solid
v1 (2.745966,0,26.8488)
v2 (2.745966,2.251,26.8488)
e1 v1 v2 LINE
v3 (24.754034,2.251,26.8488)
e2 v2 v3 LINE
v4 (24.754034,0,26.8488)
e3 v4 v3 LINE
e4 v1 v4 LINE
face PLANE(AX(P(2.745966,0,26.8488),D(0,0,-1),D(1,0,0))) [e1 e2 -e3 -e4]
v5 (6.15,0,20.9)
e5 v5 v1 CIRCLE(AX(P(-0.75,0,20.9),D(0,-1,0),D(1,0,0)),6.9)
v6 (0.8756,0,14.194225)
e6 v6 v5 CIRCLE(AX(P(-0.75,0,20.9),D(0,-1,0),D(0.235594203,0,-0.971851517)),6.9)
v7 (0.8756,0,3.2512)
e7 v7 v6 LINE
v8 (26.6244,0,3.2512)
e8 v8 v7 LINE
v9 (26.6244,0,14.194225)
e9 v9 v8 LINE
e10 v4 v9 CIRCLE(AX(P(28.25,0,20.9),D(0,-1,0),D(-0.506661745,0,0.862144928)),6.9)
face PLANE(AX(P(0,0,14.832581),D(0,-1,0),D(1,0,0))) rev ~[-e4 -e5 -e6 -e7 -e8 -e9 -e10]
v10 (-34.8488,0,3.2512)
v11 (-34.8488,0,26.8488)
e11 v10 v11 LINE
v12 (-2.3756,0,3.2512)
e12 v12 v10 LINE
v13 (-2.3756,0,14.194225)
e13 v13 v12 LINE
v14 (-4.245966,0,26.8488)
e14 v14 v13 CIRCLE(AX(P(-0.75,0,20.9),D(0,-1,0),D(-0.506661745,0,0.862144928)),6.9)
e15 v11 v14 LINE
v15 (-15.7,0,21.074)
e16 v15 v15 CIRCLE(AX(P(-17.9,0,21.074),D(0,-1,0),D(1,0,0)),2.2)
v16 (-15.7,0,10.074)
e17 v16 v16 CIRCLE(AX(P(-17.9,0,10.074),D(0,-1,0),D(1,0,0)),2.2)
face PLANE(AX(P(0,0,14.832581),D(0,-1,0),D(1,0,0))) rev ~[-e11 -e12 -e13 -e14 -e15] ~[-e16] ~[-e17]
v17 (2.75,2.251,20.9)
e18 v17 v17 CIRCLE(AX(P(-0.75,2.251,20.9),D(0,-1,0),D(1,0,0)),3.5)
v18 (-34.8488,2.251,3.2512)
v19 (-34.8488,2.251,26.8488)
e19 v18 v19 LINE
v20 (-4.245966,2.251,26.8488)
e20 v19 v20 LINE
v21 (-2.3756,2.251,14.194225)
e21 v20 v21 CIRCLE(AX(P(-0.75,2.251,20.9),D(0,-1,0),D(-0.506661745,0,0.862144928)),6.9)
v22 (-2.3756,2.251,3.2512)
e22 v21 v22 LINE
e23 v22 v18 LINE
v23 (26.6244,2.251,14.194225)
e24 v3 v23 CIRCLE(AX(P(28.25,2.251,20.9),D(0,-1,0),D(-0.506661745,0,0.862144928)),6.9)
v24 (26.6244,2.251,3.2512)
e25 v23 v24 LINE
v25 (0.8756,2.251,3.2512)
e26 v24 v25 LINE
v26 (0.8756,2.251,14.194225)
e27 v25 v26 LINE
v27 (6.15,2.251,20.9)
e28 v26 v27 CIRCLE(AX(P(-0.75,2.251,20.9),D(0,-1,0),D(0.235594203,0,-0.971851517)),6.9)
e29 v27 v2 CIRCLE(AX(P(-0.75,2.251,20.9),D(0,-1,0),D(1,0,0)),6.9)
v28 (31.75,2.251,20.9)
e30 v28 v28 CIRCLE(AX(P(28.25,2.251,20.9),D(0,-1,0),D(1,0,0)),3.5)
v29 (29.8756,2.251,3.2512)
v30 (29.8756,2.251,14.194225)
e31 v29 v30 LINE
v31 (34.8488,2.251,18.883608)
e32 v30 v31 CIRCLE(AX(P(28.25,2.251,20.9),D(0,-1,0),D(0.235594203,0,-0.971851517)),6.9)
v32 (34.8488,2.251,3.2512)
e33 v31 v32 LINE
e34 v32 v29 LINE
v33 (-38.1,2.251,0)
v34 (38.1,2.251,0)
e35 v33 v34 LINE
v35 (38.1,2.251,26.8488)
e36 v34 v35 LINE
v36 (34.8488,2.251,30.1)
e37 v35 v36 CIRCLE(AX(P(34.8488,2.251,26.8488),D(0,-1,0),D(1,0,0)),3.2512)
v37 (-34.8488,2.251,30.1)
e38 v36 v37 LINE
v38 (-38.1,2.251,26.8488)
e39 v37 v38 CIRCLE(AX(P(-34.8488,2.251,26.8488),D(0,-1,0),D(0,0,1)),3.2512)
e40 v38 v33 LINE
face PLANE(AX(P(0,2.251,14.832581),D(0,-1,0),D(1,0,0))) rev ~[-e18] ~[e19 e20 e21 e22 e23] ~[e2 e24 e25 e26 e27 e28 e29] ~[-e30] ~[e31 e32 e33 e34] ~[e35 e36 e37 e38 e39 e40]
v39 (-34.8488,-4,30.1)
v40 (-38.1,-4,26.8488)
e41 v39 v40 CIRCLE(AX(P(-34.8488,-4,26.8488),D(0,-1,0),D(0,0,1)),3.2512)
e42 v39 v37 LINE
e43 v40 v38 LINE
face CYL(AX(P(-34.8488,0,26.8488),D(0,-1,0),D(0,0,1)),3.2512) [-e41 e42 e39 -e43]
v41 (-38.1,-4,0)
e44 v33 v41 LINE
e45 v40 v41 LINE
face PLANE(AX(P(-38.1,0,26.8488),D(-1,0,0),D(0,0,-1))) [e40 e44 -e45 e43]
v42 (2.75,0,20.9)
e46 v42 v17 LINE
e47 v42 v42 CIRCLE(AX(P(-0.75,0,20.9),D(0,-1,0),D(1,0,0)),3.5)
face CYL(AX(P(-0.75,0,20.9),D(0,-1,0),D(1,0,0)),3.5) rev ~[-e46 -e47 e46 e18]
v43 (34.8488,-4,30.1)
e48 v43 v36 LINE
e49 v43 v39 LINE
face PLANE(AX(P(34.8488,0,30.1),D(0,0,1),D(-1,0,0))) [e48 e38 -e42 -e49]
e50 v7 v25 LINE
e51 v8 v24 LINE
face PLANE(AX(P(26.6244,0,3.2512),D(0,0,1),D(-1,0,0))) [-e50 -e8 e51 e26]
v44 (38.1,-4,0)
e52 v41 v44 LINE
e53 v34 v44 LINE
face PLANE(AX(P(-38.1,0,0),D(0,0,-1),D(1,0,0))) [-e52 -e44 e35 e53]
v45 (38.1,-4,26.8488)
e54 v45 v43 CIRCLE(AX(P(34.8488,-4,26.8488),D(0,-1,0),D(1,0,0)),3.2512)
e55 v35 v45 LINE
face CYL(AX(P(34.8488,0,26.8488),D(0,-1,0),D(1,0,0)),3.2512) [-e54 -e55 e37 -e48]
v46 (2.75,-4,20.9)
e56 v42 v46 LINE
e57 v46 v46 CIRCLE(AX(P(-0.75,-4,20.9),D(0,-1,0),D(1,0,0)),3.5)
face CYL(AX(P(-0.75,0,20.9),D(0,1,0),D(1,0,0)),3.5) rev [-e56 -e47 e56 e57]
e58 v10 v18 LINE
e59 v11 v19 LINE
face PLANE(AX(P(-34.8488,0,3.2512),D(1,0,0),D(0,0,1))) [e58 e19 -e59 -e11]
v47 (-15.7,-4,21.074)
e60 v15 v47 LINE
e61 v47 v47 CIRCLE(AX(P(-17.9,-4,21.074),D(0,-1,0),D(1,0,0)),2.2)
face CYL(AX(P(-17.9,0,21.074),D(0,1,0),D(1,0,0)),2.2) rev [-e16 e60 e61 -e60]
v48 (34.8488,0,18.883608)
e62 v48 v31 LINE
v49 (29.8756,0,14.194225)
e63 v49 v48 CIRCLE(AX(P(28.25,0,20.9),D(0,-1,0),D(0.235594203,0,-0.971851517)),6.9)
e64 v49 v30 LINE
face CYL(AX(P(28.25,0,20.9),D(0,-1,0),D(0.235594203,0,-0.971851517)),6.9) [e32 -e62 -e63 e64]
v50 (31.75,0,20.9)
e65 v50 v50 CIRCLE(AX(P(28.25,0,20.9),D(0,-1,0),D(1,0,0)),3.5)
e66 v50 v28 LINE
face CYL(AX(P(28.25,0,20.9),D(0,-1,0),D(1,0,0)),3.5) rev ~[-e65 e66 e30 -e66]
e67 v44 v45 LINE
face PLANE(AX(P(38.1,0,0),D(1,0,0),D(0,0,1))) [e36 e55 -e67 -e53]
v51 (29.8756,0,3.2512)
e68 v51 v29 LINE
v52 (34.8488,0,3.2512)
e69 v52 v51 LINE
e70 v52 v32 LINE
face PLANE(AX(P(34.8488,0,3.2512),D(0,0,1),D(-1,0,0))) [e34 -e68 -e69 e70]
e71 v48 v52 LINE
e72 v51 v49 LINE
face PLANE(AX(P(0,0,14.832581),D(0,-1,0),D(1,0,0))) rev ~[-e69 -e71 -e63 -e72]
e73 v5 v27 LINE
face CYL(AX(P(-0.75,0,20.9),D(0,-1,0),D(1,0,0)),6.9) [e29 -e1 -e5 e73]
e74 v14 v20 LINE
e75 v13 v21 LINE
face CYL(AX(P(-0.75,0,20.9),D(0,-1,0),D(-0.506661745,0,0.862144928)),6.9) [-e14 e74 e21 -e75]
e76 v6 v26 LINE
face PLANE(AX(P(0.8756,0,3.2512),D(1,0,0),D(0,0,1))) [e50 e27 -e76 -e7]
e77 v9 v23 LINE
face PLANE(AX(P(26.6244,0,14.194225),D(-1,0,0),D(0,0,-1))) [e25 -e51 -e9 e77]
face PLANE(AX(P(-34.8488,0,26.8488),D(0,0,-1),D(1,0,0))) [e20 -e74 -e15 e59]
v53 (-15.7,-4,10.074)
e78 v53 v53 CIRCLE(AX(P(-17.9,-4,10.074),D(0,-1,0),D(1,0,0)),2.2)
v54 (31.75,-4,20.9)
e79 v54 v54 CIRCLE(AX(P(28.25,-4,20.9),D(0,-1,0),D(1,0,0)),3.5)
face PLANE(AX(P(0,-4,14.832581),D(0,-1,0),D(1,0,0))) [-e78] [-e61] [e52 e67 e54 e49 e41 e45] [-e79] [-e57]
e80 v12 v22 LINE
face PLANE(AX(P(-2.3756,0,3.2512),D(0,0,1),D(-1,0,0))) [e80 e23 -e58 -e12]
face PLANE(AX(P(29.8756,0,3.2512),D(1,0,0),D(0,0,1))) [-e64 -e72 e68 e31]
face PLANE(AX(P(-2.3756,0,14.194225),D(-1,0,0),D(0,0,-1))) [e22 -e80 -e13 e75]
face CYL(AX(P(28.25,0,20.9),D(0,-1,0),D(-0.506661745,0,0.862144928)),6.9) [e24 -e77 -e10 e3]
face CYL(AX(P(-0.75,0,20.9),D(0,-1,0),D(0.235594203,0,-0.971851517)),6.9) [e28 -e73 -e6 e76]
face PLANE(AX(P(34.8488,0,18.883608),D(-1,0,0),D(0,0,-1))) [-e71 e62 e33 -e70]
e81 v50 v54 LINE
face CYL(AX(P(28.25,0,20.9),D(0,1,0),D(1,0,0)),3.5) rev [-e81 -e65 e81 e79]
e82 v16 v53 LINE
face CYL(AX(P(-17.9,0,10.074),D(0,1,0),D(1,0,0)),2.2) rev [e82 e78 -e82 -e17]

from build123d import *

# Parameters (mm, degrees)
F0_R     = 2.2
F0_R_2   = 3.5
F1_DEPTH = 4
F2_DEPTH = 2.251


with BuildPart() as f1:
    # F0 (on Front) → F1 (new body)
    with BuildSketch(Plane.XZ):
        with BuildLine():
            Line((-38.1, 26.8488), (-38.1, 0))
            Line((-38.1, 0), (38.1, 0))
            Line((38.1, 0), (38.1, 26.8488))
            ThreePointArc((38.1, 26.8488), (37.147745567, 29.147745567), (34.8488, 30.1))
            Line((34.8488, 30.1), (-34.8488, 30.1))
            ThreePointArc((-34.8488, 30.1), (-37.147745567, 29.147745567), (-38.1, 26.8488))
        make_face()
        with BuildLine():
            Line((-34.8488, 26.8488), (-4.245966041, 26.8488))
            ThreePointArc((-4.245966041, 26.8488), (-0.75, 27.8), (2.745966041, 26.8488))
            Line((2.745966041, 26.8488), (24.754033959, 26.8488))
            ThreePointArc((24.754033959, 26.8488), (28.25, 27.8), (31.745966041, 26.8488))
            Line((31.745966041, 26.8488), (34.8488, 26.8488))
            Line((34.8488, 26.8488), (34.8488, 22.9163924618))
            ThreePointArc((34.8488, 22.9163924618), (35.0742845779, 21.9193821658), (35.15, 20.9))
            ThreePointArc((35.15, 20.9), (35.0742845779, 19.8806178342), (34.8488, 18.8836075382))
            Line((34.8488, 18.8836075382), (34.8488, 3.2512))
            Line((34.8488, 3.2512), (29.8756, 3.2512))
            Line((29.8756, 3.2512), (26.6244, 3.2512))
            Line((26.6244, 3.2512), (0.8756, 3.2512))
            Line((0.8756, 3.2512), (-2.3756, 3.2512))
            Line((-2.3756, 3.2512), (-34.8488, 3.2512))
            Line((-34.8488, 3.2512), (-34.8488, 26.8488))
        make_face(mode=Mode.SUBTRACT)
        with BuildLine():
            Line((-2.3756, 3.2512), (-2.3756, 14.194224531))
            ThreePointArc((-2.3756, 14.194224531), (-7.5758464496, 19.8911292219), (-4.245966041, 26.8488))
            Line((-4.245966041, 26.8488), (-34.8488, 26.8488))
            Line((-34.8488, 26.8488), (-34.8488, 3.2512))
            Line((-34.8488, 3.2512), (-2.3756, 3.2512))
        make_face()
        with Locations((-17.9, 10.074)):
            Circle(F0_R, mode=Mode.SUBTRACT)
        with Locations((-17.9, 21.074)):
            Circle(F0_R, mode=Mode.SUBTRACT)
        with BuildLine():
            ThreePointArc((6.15, 20.9), (4.6734048346, 16.6342433262), (0.8756, 14.194224531))
            Line((0.8756, 14.194224531), (0.8756, 3.2512))
            Line((0.8756, 3.2512), (26.6244, 3.2512))
            Line((26.6244, 3.2512), (26.6244, 14.194224531))
            ThreePointArc((26.6244, 14.194224531), (21.4241535504, 19.8911292219), (24.754033959, 26.8488))
            Line((24.754033959, 26.8488), (2.745966041, 26.8488))
            ThreePointArc((2.745966041, 26.8488), (5.2388298391, 24.3269399117), (6.15, 20.9))
        make_face()
        with BuildLine():
            ThreePointArc((-4.245966041, 26.8488), (-7.5758464496, 19.8911292219), (-2.3756, 14.194224531))
            ThreePointArc((-2.3756, 14.194224531), (-0.75, 14), (0.8756, 14.194224531))
            ThreePointArc((0.8756, 14.194224531), (4.6734048346, 16.6342433262), (6.15, 20.9))
            ThreePointArc((6.15, 20.9), (5.2388298391, 24.3269399117), (2.745966041, 26.8488))
            Line((2.745966041, 26.8488), (-4.245966041, 26.8488))
        make_face()
        with Locations((-0.75, 20.9)):
            Circle(F0_R_2, mode=Mode.SUBTRACT)
        with BuildLine():
            Line((31.745966041, 26.8488), (24.754033959, 26.8488))
            ThreePointArc((24.754033959, 26.8488), (21.4241535504, 19.8911292219), (26.6244, 14.194224531))
            ThreePointArc((26.6244, 14.194224531), (28.25, 14), (29.8756, 14.194224531))
            ThreePointArc((29.8756, 14.194224531), (32.9836843037, 15.8798174423), (34.8488, 18.8836075382))
            Line((34.8488, 18.8836075382), (34.8488, 22.9163924618))
            ThreePointArc((34.8488, 22.9163924618), (33.6668286494, 25.1741042784), (31.745966041, 26.8488))
        make_face()
        with Locations((28.25, 20.9)):
            Circle(F0_R_2, mode=Mode.SUBTRACT)
        with BuildLine():
            Line((29.8756, 14.194224531), (29.8756, 3.2512))
            Line((29.8756, 3.2512), (34.8488, 3.2512))
            Line((34.8488, 3.2512), (34.8488, 18.8836075382))
            ThreePointArc((34.8488, 18.8836075382), (32.9836843037, 15.8798174423), (29.8756, 14.194224531))
        make_face()
        with BuildLine():
            Line((26.6244, 14.194224531), (26.6244, 3.2512))
            Line((26.6244, 3.2512), (29.8756, 3.2512))
            Line((29.8756, 3.2512), (29.8756, 14.194224531))
            ThreePointArc((29.8756, 14.194224531), (28.25, 14), (26.6244, 14.194224531))
        make_face()
        with BuildLine():
            ThreePointArc((0.8756, 14.194224531), (-0.75, 14), (-2.3756, 14.194224531))
            Line((-2.3756, 14.194224531), (-2.3756, 3.2512))
            Line((-2.3756, 3.2512), (0.8756, 3.2512))
            Line((0.8756, 3.2512), (0.8756, 14.194224531))
        make_face()
        with BuildLine():
            Line((34.8488, 26.8488), (31.745966041, 26.8488))
            ThreePointArc((31.745966041, 26.8488), (33.6668286494, 25.1741042784), (34.8488, 22.9163924618))
            Line((34.8488, 22.9163924618), (34.8488, 26.8488))
        make_face()
        with BuildLine():
            ThreePointArc((31.745966041, 26.8488), (28.25, 27.8), (24.754033959, 26.8488))
            Line((24.754033959, 26.8488), (31.745966041, 26.8488))
        make_face()
        with BuildLine():
            ThreePointArc((2.745966041, 26.8488), (-0.75, 27.8), (-4.245966041, 26.8488))
            Line((-4.245966041, 26.8488), (2.745966041, 26.8488))
        make_face()
        with BuildLine():
            ThreePointArc((35.15, 20.9), (35.0742845779, 21.9193821658), (34.8488, 22.9163924618))
            Line((34.8488, 22.9163924618), (34.8488, 18.8836075382))
            ThreePointArc((34.8488, 18.8836075382), (35.0742845779, 19.8806178342), (35.15, 20.9))
        make_face()
    extrude(amount=F1_DEPTH)

    # F0 (on Front) → F2 (join)
    with BuildSketch(Plane.XZ):
        with BuildLine():
            Line((-38.1, 26.8488), (-38.1, 0))
            Line((-38.1, 0), (38.1, 0))
            Line((38.1, 0), (38.1, 26.8488))
            ThreePointArc((38.1, 26.8488), (37.147745567, 29.147745567), (34.8488, 30.1))
            Line((34.8488, 30.1), (-34.8488, 30.1))
            ThreePointArc((-34.8488, 30.1), (-37.147745567, 29.147745567), (-38.1, 26.8488))
        make_face()
        with BuildLine():
            Line((-34.8488, 26.8488), (-4.245966041, 26.8488))
            ThreePointArc((-4.245966041, 26.8488), (-0.75, 27.8), (2.745966041, 26.8488))
            Line((2.745966041, 26.8488), (24.754033959, 26.8488))
            ThreePointArc((24.754033959, 26.8488), (28.25, 27.8), (31.745966041, 26.8488))
            Line((31.745966041, 26.8488), (34.8488, 26.8488))
            Line((34.8488, 26.8488), (34.8488, 22.9163924618))
            ThreePointArc((34.8488, 22.9163924618), (35.0742845779, 21.9193821658), (35.15, 20.9))
            ThreePointArc((35.15, 20.9), (35.0742845779, 19.8806178342), (34.8488, 18.8836075382))
            Line((34.8488, 18.8836075382), (34.8488, 3.2512))
            Line((34.8488, 3.2512), (29.8756, 3.2512))
            Line((29.8756, 3.2512), (26.6244, 3.2512))
            Line((26.6244, 3.2512), (0.8756, 3.2512))
            Line((0.8756, 3.2512), (-2.3756, 3.2512))
            Line((-2.3756, 3.2512), (-34.8488, 3.2512))
            Line((-34.8488, 3.2512), (-34.8488, 26.8488))
        make_face(mode=Mode.SUBTRACT)
        with BuildLine():
            ThreePointArc((-4.245966041, 26.8488), (-7.5758464496, 19.8911292219), (-2.3756, 14.194224531))
            ThreePointArc((-2.3756, 14.194224531), (-0.75, 14), (0.8756, 14.194224531))
            ThreePointArc((0.8756, 14.194224531), (4.6734048346, 16.6342433262), (6.15, 20.9))
            ThreePointArc((6.15, 20.9), (5.2388298391, 24.3269399117), (2.745966041, 26.8488))
            Line((2.745966041, 26.8488), (-4.245966041, 26.8488))
        make_face()
        with Locations((-0.75, 20.9)):
            Circle(F0_R_2, mode=Mode.SUBTRACT)
        with BuildLine():
            ThreePointArc((0.8756, 14.194224531), (-0.75, 14), (-2.3756, 14.194224531))
            Line((-2.3756, 14.194224531), (-2.3756, 3.2512))
            Line((-2.3756, 3.2512), (0.8756, 3.2512))
            Line((0.8756, 3.2512), (0.8756, 14.194224531))
        make_face()
        with BuildLine():
            ThreePointArc((2.745966041, 26.8488), (-0.75, 27.8), (-4.245966041, 26.8488))
            Line((-4.245966041, 26.8488), (2.745966041, 26.8488))
        make_face()
        with BuildLine():
            Line((26.6244, 14.194224531), (26.6244, 3.2512))
            Line((26.6244, 3.2512), (29.8756, 3.2512))
            Line((29.8756, 3.2512), (29.8756, 14.194224531))
            ThreePointArc((29.8756, 14.194224531), (28.25, 14), (26.6244, 14.194224531))
        make_face()
        with BuildLine():
            Line((31.745966041, 26.8488), (24.754033959, 26.8488))
            ThreePointArc((24.754033959, 26.8488), (21.4241535504, 19.8911292219), (26.6244, 14.194224531))
            ThreePointArc((26.6244, 14.194224531), (28.25, 14), (29.8756, 14.194224531))
            ThreePointArc((29.8756, 14.194224531), (32.9836843037, 15.8798174423), (34.8488, 18.8836075382))
            Line((34.8488, 18.8836075382), (34.8488, 22.9163924618))
            ThreePointArc((34.8488, 22.9163924618), (33.6668286494, 25.1741042784), (31.745966041, 26.8488))
        make_face()
        with Locations((28.25, 20.9)):
            Circle(F0_R_2, mode=Mode.SUBTRACT)
        with BuildLine():
            ThreePointArc((31.745966041, 26.8488), (28.25, 27.8), (24.754033959, 26.8488))
            Line((24.754033959, 26.8488), (31.745966041, 26.8488))
        make_face()
        with BuildLine():
            Line((34.8488, 26.8488), (31.745966041, 26.8488))
            ThreePointArc((31.745966041, 26.8488), (33.6668286494, 25.1741042784), (34.8488, 22.9163924618))
            Line((34.8488, 22.9163924618), (34.8488, 26.8488))
        make_face()
        with BuildLine():
            ThreePointArc((35.15, 20.9), (35.0742845779, 21.9193821658), (34.8488, 22.9163924618))
            Line((34.8488, 22.9163924618), (34.8488, 18.8836075382))
            ThreePointArc((34.8488, 18.8836075382), (35.0742845779, 19.8806178342), (35.15, 20.9))
        make_face()
    extrude(amount=-F2_DEPTH)


solid = f1.part
